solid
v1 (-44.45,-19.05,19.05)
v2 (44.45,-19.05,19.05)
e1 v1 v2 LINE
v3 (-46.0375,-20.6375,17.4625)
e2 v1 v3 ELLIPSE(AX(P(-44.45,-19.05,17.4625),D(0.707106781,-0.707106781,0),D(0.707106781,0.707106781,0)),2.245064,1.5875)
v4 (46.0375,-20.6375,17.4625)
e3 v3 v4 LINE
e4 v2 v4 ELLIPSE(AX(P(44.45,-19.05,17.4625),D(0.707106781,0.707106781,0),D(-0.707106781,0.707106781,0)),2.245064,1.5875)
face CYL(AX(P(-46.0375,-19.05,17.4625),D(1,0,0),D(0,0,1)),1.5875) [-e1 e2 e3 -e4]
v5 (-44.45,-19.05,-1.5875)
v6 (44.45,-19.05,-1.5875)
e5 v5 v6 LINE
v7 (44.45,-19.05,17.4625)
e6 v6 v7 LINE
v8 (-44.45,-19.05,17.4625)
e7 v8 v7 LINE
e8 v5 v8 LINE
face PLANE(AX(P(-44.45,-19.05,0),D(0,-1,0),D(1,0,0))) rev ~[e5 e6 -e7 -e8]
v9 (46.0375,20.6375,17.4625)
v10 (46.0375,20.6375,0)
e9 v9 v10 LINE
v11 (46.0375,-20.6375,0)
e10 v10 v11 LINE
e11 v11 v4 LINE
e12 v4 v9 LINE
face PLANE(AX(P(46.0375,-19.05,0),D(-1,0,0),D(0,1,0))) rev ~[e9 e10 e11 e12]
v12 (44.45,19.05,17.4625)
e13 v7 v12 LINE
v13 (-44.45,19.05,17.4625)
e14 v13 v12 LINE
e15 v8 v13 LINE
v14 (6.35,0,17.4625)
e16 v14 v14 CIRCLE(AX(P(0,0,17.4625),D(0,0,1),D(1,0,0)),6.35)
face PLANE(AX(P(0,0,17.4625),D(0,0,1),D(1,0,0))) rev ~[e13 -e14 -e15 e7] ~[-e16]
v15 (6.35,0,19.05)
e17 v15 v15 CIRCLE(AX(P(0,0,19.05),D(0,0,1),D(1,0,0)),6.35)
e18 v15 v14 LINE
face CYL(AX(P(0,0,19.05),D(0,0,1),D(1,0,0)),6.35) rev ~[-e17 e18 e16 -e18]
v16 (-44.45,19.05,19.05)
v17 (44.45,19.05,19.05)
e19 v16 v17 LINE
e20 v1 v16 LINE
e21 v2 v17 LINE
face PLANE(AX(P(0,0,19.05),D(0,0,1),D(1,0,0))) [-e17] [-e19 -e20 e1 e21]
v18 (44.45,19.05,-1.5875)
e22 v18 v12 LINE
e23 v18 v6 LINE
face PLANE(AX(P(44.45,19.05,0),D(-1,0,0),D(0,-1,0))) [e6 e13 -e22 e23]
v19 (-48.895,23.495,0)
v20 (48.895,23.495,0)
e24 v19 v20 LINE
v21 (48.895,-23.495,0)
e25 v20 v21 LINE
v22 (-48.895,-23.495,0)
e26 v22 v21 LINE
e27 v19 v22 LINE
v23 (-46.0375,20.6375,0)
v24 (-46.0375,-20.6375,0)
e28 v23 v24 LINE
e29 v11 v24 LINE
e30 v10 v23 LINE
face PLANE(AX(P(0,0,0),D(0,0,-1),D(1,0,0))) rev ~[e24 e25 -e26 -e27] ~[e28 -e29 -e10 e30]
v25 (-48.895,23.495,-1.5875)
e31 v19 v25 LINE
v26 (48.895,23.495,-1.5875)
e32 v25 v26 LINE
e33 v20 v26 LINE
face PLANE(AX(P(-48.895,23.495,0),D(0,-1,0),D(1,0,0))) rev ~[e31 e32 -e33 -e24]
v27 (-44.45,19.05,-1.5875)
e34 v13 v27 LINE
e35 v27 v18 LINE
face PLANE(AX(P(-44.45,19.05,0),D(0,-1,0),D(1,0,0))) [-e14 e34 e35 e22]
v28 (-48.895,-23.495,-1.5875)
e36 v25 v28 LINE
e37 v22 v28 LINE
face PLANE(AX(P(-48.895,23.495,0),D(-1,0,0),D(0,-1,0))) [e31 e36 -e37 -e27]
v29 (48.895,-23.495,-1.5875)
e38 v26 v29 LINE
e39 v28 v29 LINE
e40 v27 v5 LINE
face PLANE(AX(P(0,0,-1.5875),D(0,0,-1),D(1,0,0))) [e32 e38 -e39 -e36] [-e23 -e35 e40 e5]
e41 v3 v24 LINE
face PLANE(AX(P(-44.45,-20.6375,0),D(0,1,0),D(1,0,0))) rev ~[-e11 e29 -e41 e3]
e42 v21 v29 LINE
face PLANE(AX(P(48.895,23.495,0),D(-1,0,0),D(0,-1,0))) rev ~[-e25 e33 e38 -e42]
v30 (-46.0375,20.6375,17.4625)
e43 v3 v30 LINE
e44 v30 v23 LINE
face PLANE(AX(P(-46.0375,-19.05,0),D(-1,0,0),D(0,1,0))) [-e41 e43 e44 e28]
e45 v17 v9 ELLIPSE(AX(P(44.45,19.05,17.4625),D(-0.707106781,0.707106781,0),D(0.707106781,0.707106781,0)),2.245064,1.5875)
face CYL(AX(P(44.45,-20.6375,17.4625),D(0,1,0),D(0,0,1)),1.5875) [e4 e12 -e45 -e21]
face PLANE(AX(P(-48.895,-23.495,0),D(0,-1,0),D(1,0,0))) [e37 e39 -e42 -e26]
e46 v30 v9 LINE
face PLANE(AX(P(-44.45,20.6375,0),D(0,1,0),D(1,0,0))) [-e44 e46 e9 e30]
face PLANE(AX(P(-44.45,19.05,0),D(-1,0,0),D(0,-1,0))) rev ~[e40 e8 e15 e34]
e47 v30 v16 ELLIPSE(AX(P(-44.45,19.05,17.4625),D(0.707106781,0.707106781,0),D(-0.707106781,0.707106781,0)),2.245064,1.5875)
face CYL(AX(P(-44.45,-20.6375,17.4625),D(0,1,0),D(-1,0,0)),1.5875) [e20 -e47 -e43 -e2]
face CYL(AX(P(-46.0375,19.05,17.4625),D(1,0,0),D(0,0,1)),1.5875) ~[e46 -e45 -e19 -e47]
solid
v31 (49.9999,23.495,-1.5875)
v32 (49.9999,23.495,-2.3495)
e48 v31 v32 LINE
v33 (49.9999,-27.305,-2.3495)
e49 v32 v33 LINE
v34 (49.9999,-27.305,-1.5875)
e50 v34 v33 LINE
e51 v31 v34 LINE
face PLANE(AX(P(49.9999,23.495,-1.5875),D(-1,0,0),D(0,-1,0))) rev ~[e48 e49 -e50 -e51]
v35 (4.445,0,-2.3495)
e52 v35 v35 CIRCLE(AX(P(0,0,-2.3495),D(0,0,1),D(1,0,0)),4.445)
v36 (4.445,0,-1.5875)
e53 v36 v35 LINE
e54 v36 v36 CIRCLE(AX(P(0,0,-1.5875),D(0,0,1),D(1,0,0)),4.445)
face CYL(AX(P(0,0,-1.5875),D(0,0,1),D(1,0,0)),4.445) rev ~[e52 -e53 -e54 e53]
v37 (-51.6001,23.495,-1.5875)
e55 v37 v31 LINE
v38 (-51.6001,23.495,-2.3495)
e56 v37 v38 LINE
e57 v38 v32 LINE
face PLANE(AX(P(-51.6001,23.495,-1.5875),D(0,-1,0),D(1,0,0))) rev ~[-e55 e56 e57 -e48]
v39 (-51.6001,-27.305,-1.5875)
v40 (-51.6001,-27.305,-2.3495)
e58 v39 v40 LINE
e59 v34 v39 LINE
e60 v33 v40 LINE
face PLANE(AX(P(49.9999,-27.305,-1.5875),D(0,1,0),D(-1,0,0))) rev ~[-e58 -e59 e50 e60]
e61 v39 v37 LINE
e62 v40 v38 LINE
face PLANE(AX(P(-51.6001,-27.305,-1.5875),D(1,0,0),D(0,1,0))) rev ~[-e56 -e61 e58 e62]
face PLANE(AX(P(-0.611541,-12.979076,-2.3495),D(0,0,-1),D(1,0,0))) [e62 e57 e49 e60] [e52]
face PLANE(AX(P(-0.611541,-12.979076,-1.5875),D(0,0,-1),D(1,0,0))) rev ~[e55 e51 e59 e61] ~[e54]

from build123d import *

# Parameters (mm, degrees)
F0_W      = 88.9
F0_H      = 38.1
F1_DEPTH  = 17.4625
F2_T      = 1.5875
F3_W      = 97.79
F3_H      = 46.99
F3_W_2    = 88.9
F3_H_2    = 38.1
F4_DEPTH  = 1.5875
F5_R      = 1.5875
F6_R      = 6.35
F7_DEPTH  = 25.4
F8_W      = 97.79
F8_H      = 46.99
F8_W_2    = 88.9
F8_H_2    = 38.1
F9_DEPTH  = 0.762
F10_R     = 4.445
F11_DEPTH = 0.762


with BuildPart() as f1:
    # F0 (on Top) → F1 (new body)
    with BuildSketch(Plane.XY):
        Rectangle(F0_W, F0_H)
    extrude(amount=F1_DEPTH)

    # F2
    f2_openings = [f1.faces().sort_by_distance(p)[0] for p in [
        (0, 0, 0),
    ]]
    offset(amount=F2_T, openings=f2_openings, kind=Kind.INTERSECTION)

    # F3 (on face) → F4 (join)
    with BuildSketch(Plane(origin=(0, 0, 0), x_dir=(1, 0, 0), z_dir=(0, 0, -1))):
        Rectangle(F3_W, F3_H)
        Rectangle(F3_W_2, F3_H_2, mode=Mode.SUBTRACT)
    extrude(amount=F4_DEPTH)

    # F5
    f5_edges = [f1.edges().sort_by_distance(p)[0] for p in [
        (46.0375, 0, 19.05),
        (0, -20.6375, 19.05),
        (-46.0375, 0, 19.05),
        (0, 20.6375, 19.05),
    ]]
    fillet(f5_edges, radius=F5_R)

    # F6 (on face) → F7 (cut)
    with BuildSketch(Plane.XY.offset(19.05)):
        Circle(F6_R)
    extrude(amount=-F7_DEPTH, mode=Mode.SUBTRACT)


with BuildPart() as f9:
    # F8 (on face) → F9 (new body)
    with BuildSketch(Plane(origin=(0, 0, -1.5875), x_dir=(1, 0, 0), z_dir=(0, 0, -1))):
        Polygon((49.9999, 27.305), (-51.6001, 27.305), (-51.6001, -23.495), (-48.895, -23.495), (-48.895, 23.495), (48.895, 23.495), (48.895, -23.495), (49.9999, -23.495), align=None)
        Rectangle(F8_W, F8_H)
        Rectangle(F8_W_2, F8_H_2, mode=Mode.SUBTRACT)
        Rectangle(F8_W_2, F8_H_2)
    extrude(amount=F9_DEPTH)

    # F10 (on face) → F11 (cut, through all)
    with BuildSketch(Plane.XY.offset(-1.5875)):
        Circle(F10_R)
    extrude(amount=-F11_DEPTH, mode=Mode.SUBTRACT)


solid = Compound([f1.part, f9.part])
